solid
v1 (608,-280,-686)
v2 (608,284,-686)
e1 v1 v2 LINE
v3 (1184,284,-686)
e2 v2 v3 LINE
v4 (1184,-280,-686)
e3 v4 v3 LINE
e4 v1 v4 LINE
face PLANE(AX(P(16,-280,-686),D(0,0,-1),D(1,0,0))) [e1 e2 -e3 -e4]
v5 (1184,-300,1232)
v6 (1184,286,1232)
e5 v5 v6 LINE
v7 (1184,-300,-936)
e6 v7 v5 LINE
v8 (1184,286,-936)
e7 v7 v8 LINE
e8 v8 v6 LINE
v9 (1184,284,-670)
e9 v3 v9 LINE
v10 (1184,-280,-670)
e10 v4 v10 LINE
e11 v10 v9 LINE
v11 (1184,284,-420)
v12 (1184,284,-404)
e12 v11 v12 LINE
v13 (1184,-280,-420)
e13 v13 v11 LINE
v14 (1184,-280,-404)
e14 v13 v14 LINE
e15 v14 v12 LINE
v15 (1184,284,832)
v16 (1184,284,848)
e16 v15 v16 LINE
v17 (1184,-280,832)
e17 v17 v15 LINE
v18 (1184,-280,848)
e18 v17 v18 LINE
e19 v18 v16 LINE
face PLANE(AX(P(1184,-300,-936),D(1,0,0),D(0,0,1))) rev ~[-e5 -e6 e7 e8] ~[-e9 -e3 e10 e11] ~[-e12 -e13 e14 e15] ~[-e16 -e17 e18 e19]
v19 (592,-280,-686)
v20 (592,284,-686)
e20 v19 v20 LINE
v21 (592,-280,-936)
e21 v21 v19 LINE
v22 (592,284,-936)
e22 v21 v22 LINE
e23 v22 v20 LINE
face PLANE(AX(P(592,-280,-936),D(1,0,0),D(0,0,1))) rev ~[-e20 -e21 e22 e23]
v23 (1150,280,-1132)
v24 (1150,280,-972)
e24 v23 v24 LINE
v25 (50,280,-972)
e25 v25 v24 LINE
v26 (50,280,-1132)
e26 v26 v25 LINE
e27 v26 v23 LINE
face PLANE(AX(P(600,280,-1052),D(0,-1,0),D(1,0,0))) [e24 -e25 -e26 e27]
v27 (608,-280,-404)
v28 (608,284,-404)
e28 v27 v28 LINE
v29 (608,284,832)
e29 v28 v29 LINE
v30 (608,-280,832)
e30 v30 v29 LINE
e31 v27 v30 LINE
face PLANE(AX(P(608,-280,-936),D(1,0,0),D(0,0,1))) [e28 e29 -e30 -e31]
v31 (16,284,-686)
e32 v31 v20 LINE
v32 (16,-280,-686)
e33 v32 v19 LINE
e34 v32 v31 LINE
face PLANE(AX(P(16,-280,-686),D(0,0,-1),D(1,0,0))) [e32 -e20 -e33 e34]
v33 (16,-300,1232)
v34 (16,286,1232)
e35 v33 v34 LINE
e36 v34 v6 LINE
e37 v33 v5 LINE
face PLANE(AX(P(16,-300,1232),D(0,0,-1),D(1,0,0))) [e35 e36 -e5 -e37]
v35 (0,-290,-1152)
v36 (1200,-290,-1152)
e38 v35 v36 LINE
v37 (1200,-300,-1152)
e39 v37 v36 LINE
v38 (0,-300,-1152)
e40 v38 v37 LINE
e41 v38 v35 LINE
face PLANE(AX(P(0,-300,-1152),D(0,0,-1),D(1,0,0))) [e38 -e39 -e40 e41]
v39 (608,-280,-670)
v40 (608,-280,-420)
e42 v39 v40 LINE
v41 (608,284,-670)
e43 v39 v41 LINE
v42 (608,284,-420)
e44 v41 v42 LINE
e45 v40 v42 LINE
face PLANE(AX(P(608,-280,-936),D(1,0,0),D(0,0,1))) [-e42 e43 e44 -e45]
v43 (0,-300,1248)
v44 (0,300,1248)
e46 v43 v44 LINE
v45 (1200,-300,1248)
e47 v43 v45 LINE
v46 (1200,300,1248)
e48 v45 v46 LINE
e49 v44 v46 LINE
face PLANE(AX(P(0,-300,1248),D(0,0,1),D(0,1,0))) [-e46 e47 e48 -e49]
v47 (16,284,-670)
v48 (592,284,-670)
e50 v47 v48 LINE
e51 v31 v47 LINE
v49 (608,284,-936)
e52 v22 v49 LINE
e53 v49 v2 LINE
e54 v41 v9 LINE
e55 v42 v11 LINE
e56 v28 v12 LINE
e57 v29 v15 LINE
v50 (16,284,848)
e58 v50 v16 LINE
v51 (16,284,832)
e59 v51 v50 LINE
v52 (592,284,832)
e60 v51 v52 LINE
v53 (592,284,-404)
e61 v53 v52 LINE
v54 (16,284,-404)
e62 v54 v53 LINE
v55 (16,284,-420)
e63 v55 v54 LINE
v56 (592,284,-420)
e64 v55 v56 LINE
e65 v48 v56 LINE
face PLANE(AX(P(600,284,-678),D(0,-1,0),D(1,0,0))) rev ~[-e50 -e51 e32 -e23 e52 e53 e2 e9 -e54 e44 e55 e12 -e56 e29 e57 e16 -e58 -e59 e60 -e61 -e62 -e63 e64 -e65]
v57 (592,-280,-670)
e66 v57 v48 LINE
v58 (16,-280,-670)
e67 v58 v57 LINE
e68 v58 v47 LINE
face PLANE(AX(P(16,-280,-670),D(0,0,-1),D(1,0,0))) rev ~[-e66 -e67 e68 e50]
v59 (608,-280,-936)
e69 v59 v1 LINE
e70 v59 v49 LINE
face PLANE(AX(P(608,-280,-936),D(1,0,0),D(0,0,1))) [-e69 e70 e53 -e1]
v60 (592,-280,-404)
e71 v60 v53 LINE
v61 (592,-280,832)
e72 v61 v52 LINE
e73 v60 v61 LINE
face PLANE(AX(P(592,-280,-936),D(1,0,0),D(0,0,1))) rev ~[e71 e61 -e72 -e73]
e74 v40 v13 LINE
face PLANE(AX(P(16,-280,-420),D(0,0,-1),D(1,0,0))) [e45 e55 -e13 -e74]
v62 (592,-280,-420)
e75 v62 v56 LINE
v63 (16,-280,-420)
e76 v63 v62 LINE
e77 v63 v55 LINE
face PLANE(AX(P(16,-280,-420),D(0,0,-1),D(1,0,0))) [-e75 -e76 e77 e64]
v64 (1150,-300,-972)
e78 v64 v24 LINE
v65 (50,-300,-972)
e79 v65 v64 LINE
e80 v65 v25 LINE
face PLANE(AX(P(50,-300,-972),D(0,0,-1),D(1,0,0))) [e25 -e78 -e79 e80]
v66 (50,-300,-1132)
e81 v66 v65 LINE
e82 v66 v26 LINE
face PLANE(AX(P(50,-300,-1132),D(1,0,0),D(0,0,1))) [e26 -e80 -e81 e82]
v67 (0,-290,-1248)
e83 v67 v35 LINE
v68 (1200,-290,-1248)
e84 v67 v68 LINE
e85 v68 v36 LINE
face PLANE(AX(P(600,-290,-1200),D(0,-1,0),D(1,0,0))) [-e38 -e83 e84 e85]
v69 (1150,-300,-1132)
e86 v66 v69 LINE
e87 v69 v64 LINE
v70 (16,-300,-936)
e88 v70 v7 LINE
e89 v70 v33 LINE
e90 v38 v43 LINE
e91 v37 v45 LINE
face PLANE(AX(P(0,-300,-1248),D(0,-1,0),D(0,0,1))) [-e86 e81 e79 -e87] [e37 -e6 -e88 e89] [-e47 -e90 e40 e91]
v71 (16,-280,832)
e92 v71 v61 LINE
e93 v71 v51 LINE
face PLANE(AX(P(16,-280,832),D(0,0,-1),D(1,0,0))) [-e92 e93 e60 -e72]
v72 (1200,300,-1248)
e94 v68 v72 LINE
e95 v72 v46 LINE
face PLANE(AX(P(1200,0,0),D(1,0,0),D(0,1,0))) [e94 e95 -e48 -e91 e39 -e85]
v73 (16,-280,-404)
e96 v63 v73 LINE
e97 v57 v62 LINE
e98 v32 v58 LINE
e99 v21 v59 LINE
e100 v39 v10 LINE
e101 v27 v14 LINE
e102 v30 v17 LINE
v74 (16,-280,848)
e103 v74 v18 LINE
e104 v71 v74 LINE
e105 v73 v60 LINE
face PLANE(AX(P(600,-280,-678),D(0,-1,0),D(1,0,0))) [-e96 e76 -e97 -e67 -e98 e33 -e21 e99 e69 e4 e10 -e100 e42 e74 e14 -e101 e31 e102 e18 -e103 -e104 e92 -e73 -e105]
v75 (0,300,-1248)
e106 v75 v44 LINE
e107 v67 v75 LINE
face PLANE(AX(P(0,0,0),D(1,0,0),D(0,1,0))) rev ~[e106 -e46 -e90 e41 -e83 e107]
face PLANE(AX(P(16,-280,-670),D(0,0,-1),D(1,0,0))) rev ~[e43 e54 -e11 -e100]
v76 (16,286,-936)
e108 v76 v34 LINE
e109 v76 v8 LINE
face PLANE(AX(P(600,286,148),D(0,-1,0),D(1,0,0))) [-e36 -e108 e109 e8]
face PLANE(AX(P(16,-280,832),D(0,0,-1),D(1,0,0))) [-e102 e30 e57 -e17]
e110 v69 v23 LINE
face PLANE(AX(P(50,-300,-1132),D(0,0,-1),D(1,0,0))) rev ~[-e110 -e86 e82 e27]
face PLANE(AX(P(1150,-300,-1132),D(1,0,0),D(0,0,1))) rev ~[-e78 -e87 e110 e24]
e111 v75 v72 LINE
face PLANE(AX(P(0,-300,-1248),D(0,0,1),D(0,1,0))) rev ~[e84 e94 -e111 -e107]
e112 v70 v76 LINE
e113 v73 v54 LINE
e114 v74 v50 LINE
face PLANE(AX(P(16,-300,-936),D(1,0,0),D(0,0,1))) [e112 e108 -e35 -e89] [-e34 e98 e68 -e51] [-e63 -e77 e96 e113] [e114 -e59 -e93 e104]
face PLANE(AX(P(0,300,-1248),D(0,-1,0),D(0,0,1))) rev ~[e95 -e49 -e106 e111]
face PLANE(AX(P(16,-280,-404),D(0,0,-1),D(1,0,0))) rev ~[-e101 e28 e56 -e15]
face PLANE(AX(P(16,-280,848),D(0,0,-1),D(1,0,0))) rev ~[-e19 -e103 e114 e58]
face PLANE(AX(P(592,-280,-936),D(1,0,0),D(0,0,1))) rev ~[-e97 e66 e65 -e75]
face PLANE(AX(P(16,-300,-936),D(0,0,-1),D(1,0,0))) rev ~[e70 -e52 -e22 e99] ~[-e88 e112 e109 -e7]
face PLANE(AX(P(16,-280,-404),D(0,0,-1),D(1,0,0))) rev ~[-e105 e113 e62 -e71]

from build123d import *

# Parameters (mm, degrees)
F0_W      = 600
F0_H      = 2496
F1_DEPTH  = 1200
F2_W      = 1200
F2_H      = 96
F3_DEPTH  = 10
F4_W      = 1100
F4_H      = 160
F5_DEPTH  = 580
F7_W      = 1168
F7_H      = 2168
F8_DEPTH  = 586
F9_W      = 1168
F9_H      = 16
F10_DEPTH = 564
F11_W     = 16
F11_H     = 1768
F12_DEPTH = 564
F13_W     = 1168
F13_H     = 16
F14_DEPTH = 564


with BuildPart() as f1:
    # F0 (on Right) → F1 (new body)
    with BuildSketch(Plane.YZ):
        Rectangle(F0_W, F0_H)
    extrude(amount=F1_DEPTH)

    # F2 (on face) → F3 (cut)
    with BuildSketch(Plane.XZ.offset(300)):
        with Locations((600, -1200)):
            Rectangle(F2_W, F2_H)
    extrude(amount=-F3_DEPTH, mode=Mode.SUBTRACT)

    # F4 (on face) → F5 (cut)
    with BuildSketch(Plane.XZ.offset(300)):
        with Locations((600, -1052)):
            Rectangle(F4_W, F4_H)
    extrude(amount=-F5_DEPTH, mode=Mode.SUBTRACT)

    # F7 (on face) → F8 (cut)
    with BuildSketch(Plane.XZ.offset(300)):
        with Locations((600, 148)):
            Rectangle(F7_W, F7_H)
    extrude(amount=-F8_DEPTH, mode=Mode.SUBTRACT)

    # F9 (on offset) → F10 (join)
    with BuildSketch(Plane.XZ.offset(280)):
        with Locations((600, 840)):
            Rectangle(F9_W, F9_H)
    extrude(amount=-F10_DEPTH)

    # F11 (on offset) → F12 (join)
    with BuildSketch(Plane.XZ.offset(280)):
        with Locations((600, -52)):
            Rectangle(F11_W, F11_H)
    extrude(amount=-F12_DEPTH)

    # F13 (on offset) → F14 (join)
    with BuildSketch(Plane.XZ.offset(280)):
        with Locations((600, -678)):
            Rectangle(F13_W, F13_H)
        with Locations((600, -412)):
            Rectangle(F13_W, F13_H)
    extrude(amount=-F14_DEPTH)


solid = f1.part
